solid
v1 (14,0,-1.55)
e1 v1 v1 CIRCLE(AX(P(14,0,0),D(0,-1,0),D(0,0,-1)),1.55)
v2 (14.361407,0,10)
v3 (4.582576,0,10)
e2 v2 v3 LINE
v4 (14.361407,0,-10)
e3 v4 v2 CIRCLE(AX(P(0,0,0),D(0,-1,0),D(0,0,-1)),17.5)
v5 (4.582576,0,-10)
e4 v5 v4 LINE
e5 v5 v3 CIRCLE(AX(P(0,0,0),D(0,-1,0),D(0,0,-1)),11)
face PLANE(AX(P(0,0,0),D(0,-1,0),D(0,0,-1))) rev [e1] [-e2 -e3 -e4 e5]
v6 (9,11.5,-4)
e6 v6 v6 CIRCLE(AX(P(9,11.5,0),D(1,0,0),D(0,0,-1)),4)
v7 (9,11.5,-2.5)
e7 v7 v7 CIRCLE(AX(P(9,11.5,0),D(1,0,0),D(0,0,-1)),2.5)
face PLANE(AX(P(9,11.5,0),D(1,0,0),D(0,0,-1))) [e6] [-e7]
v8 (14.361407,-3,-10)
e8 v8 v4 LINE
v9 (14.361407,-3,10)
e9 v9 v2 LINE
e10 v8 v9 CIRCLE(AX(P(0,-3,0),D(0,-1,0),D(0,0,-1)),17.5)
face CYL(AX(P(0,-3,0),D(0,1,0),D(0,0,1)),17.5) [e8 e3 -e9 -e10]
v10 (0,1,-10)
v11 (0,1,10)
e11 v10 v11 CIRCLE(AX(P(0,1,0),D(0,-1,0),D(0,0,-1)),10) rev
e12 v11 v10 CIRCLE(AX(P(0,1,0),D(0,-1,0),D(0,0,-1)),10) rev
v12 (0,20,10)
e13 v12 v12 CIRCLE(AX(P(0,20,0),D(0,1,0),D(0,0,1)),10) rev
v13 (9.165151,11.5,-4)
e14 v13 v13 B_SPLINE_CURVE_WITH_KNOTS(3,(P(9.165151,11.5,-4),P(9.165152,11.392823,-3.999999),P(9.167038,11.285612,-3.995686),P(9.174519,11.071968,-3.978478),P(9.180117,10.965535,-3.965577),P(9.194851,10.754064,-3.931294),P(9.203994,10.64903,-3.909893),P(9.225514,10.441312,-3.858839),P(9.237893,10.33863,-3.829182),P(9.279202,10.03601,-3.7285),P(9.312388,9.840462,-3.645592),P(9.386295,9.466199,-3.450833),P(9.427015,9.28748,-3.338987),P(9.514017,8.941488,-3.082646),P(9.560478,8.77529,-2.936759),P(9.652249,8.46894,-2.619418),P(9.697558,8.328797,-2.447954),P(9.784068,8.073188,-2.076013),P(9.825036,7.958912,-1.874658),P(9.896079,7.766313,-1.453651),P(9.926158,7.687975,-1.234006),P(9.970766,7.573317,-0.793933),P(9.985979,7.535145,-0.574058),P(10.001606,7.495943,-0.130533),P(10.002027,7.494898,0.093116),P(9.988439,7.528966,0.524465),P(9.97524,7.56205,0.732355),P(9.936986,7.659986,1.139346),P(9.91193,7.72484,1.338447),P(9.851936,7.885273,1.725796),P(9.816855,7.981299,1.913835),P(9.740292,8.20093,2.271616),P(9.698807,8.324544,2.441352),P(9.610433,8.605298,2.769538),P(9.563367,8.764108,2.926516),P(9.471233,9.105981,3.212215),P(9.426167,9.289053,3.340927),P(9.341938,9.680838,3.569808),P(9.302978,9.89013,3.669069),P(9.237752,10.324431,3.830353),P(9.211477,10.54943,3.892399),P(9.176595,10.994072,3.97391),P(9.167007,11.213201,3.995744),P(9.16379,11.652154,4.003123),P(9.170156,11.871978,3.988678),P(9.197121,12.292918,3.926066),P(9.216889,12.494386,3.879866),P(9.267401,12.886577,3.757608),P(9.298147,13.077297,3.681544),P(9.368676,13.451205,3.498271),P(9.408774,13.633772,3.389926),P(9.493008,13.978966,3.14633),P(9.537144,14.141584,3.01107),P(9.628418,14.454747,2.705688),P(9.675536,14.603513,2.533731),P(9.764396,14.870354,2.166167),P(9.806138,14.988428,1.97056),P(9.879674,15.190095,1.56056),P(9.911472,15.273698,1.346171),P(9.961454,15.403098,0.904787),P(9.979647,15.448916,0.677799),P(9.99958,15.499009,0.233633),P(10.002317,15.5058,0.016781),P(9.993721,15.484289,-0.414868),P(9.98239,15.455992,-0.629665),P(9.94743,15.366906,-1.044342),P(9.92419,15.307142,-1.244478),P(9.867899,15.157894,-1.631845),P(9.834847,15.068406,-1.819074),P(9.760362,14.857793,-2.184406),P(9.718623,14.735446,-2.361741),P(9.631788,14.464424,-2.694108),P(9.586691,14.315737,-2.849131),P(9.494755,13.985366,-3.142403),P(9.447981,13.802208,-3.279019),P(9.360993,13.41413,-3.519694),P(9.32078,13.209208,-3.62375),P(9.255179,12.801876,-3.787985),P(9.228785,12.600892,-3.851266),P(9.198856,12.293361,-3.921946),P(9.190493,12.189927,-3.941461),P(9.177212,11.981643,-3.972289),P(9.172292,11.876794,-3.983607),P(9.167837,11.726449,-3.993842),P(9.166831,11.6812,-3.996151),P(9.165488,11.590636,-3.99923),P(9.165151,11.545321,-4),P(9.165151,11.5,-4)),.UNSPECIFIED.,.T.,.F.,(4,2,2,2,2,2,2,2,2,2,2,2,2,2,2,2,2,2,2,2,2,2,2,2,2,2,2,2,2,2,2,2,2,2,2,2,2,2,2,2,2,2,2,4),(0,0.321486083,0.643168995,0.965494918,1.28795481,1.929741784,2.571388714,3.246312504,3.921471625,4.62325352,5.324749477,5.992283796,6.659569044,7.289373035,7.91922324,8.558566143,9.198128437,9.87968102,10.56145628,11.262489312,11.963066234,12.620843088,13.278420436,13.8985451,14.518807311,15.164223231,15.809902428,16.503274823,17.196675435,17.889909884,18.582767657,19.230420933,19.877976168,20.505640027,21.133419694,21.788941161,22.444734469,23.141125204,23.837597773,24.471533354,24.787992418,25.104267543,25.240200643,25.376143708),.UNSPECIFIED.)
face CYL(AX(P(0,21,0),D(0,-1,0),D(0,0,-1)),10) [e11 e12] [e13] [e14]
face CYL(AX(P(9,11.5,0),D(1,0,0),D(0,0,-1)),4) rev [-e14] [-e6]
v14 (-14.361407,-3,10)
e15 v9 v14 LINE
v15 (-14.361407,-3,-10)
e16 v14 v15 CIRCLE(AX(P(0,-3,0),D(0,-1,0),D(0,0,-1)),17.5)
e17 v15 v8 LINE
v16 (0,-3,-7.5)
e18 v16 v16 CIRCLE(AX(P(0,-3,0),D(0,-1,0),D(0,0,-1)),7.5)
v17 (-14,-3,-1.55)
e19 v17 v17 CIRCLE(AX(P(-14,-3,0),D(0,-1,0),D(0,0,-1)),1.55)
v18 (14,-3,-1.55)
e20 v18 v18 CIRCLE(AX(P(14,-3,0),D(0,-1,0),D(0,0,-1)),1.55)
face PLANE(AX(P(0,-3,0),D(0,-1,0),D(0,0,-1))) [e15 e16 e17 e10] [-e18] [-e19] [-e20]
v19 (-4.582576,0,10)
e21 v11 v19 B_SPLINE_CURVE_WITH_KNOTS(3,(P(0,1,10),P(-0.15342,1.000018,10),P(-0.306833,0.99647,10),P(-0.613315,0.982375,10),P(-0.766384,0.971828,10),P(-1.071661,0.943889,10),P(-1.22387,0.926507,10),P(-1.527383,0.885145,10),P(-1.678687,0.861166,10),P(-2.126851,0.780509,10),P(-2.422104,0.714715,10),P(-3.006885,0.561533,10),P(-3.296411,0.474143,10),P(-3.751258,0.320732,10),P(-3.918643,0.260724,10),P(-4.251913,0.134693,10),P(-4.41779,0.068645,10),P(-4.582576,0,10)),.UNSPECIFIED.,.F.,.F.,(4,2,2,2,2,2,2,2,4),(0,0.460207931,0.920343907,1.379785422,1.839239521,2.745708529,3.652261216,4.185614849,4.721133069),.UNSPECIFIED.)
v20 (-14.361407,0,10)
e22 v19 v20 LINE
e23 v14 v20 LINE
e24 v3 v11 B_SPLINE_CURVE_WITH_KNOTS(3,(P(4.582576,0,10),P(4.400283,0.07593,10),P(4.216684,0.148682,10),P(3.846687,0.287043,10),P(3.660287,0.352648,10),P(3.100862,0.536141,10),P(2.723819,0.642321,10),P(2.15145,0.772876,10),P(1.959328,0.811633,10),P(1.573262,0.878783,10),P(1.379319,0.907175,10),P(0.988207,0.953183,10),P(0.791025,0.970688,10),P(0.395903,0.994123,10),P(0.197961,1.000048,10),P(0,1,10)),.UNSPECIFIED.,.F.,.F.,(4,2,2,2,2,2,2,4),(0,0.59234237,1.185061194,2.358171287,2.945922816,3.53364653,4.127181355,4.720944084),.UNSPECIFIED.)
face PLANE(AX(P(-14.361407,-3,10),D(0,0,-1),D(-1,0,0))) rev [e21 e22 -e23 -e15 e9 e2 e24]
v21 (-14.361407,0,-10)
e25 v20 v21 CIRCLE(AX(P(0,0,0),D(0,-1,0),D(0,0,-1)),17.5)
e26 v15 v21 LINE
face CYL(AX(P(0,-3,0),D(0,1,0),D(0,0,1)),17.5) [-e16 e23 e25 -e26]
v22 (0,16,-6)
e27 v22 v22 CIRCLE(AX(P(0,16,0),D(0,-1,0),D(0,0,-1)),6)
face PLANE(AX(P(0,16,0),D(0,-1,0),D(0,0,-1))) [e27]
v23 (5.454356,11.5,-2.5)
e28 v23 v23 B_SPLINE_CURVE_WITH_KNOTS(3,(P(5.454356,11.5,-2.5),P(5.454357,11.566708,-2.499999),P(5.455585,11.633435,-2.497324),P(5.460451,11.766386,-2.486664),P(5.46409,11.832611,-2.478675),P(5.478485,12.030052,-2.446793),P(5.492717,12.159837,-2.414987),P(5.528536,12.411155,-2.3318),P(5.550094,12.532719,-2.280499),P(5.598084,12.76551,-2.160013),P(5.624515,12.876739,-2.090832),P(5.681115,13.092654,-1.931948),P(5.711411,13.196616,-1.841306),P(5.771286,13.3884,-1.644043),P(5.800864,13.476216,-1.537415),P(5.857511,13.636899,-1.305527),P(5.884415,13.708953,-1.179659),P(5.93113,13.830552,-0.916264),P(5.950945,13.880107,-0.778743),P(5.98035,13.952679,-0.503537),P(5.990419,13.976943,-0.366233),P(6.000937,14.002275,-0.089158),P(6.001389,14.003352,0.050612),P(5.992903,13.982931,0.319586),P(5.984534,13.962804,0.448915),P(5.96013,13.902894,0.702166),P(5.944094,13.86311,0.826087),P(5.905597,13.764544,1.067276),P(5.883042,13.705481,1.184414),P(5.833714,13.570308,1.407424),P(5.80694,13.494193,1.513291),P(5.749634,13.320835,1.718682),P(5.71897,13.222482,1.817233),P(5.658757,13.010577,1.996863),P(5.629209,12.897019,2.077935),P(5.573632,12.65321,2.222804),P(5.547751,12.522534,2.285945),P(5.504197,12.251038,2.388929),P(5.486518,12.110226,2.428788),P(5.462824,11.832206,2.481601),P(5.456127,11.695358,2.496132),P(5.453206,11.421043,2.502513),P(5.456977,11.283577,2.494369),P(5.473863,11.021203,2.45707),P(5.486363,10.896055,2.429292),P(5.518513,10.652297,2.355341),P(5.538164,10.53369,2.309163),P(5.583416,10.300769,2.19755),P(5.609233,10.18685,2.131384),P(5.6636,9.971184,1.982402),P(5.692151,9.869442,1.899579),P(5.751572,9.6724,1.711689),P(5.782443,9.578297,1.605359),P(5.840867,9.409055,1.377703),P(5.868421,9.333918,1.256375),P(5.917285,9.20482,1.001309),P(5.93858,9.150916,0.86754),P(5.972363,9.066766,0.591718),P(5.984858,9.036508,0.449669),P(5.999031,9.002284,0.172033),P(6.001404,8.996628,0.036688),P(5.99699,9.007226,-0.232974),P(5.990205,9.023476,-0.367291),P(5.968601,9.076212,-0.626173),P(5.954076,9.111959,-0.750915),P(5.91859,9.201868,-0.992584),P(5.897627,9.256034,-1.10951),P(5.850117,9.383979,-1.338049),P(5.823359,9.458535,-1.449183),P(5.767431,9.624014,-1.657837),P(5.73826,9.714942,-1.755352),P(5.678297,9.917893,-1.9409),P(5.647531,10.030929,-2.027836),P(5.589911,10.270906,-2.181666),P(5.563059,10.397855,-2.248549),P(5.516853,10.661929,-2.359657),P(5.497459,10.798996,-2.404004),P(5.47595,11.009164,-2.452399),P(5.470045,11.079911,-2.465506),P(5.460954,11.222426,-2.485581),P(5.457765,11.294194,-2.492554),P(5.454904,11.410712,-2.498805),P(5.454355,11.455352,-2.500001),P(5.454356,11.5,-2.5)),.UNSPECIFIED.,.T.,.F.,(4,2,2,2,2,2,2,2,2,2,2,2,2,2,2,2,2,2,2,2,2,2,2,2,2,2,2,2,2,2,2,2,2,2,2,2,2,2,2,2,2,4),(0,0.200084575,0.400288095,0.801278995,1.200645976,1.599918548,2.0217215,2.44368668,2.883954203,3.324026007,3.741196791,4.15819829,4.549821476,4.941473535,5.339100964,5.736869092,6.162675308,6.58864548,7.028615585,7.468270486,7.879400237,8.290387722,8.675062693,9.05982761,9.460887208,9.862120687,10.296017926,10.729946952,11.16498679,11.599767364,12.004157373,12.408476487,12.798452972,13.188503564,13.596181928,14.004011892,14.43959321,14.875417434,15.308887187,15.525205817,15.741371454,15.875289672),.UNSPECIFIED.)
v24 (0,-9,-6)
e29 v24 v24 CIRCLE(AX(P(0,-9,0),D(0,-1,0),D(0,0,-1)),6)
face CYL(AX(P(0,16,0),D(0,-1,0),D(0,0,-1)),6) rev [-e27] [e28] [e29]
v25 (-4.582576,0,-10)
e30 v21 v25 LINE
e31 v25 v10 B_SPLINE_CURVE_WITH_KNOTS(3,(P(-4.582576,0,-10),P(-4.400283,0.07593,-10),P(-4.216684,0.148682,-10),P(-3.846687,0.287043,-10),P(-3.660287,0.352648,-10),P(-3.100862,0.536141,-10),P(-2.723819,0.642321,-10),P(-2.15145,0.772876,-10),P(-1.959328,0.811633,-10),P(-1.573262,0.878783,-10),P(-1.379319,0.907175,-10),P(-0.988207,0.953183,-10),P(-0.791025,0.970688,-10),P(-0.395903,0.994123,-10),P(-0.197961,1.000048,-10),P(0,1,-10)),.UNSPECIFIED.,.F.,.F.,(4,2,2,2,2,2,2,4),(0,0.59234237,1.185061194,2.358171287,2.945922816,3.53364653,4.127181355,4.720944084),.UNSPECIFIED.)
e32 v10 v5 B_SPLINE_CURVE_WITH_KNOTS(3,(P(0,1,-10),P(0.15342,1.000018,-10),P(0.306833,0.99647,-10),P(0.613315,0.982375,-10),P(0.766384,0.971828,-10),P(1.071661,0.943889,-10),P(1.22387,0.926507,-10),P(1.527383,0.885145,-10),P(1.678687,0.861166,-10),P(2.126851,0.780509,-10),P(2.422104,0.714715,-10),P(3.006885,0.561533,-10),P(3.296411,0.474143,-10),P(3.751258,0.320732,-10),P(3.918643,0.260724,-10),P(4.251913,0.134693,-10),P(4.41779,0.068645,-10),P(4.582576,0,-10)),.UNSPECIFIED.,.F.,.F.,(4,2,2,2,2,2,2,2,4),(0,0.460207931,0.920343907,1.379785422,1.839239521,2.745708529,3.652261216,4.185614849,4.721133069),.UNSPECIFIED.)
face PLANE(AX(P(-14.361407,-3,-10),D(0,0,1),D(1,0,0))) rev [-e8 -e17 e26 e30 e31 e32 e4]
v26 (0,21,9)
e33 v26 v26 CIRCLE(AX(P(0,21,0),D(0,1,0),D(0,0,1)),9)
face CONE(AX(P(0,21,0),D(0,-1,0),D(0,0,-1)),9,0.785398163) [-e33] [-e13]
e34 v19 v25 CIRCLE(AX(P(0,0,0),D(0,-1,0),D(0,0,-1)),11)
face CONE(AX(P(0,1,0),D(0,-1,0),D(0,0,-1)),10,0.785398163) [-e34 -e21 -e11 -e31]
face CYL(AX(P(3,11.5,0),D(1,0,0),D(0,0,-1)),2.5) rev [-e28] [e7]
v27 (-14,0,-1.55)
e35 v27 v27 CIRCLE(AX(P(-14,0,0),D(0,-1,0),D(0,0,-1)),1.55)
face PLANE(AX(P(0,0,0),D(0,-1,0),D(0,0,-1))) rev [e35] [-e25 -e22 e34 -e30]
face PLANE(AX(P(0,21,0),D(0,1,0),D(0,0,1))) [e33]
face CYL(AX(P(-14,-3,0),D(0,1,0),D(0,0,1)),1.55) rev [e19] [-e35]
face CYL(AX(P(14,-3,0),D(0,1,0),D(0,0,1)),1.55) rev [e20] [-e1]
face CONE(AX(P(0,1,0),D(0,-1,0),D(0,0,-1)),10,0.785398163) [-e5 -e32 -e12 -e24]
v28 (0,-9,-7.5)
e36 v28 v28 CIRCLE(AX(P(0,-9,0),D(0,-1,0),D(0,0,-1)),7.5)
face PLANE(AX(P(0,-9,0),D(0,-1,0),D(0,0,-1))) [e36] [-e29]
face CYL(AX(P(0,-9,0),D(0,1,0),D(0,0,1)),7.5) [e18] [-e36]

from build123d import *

# Parameters (mm, degrees)
SKETCH1_R           = 10
BOSS_EXTRUDE1_DEPTH = 21
SKETCH2_R           = 1.55
BOSS_EXTRUDE2_DEPTH = 3
SKETCH3_R           = 7.5
BOSS_EXTRUDE3_DEPTH = 6
SKETCH4_R           = 6
CUT_EXTRUDE1_DEPTH  = 25
SKETCH6_R           = 4
CUT_EXTRUDE2_DEPTH  = 1
SKETCH7_R           = 2.5
CUT_EXTRUDE3_DEPTH  = 6
CHAMFER1_SIZE       = 1


with BuildPart() as part:
    # Sketch1 → Boss-Extrude1 (new body)
    with BuildSketch(Plane(origin=(0, 0, 0), x_dir=(1, 0, 0), z_dir=(0, 1, 0))):
        with Locations(Location((0, 0, 0), (0, 0, 90))):
            Circle(SKETCH1_R)
    extrude(amount=BOSS_EXTRUDE1_DEPTH)

    # Sketch2 → Boss-Extrude2 (add)
    with BuildSketch(Plane.XZ):
        with BuildLine():
            Line((-14.361406616, -10), (14.361406616, -10))
            ThreePointArc((14.361406616, -10), (17.5, 0), (14.361406616, 10))
            Line((14.361406616, 10), (-14.361406616, 10))
            ThreePointArc((-14.361406616, 10), (-17.5, 0), (-14.361406616, -10))
        make_face()
        with Locations(Location((-14, 0, 0), (0, 0, 270))):
            Circle(SKETCH2_R, mode=Mode.SUBTRACT)
        with Locations(Location((14, 0, 0), (0, 0, 270))):
            Circle(SKETCH2_R, mode=Mode.SUBTRACT)
    extrude(amount=BOSS_EXTRUDE2_DEPTH)

    # Sketch3 → Boss-Extrude3 (add)
    with BuildSketch(Plane.XZ.offset(3)):
        with Locations(Location((0, 0, 0), (0, 0, 270))):
            Circle(SKETCH3_R)
    extrude(amount=BOSS_EXTRUDE3_DEPTH)

    # Sketch4 → Cut-Extrude1 (cut)
    with BuildSketch(Plane.XZ.offset(9)):
        with Locations(Location((0, 0, 0), (0, 0, 270))):
            Circle(SKETCH4_R)
    extrude(amount=-CUT_EXTRUDE1_DEPTH, mode=Mode.SUBTRACT)

    # Sketch6 → Cut-Extrude2 (cut)
    with BuildSketch(Plane(origin=(10, 0, 0), x_dir=(0, 0, -1), z_dir=(1, 0, 0))):
        with Locations((0, 11.5)):
            Circle(SKETCH6_R)
    extrude(amount=-CUT_EXTRUDE2_DEPTH, mode=Mode.SUBTRACT)

    # Sketch7 → Cut-Extrude3 (cut)
    with BuildSketch(Plane(origin=(9, 0, 0), x_dir=(0, 0, -1), z_dir=(1, 0, 0))):
        with Locations((0, 11.5)):
            Circle(SKETCH7_R)
    extrude(amount=-CUT_EXTRUDE3_DEPTH, mode=Mode.SUBTRACT)

    # Chamfer1
    # the kernel refuses this chamfer: 1 mm, written as the material it adds along each edge
    with BuildSketch(Plane(origin=(0, 0, 0), x_dir=(-2.2377941338409155e-09, 0, 1.0), z_dir=(-1.0, 0, -2.2377941338409155e-09))) as chamfer1_piece_1_section:
        Polygon((10, CHAMFER1_SIZE), (10 + CHAMFER1_SIZE, 0), (10, 0), align=None)
    chamfer1_piece_1 = revolve(axis=Axis((0, 0, 0), (0, 1, 0)), revolution_arc=180.000000128, mode=Mode.PRIVATE)
    chamfer1_piece_1 = split(chamfer1_piece_1, bisect_by=Plane(origin=(10.483044341, 0.483044342, -10), z_dir=(0, 0, 1)), keep=Keep.TOP, mode=Mode.PRIVATE)
    chamfer1_piece_1 = split(chamfer1_piece_1, bisect_by=Plane(origin=(10.483044341, 0.483044342, 10), z_dir=(0, 0, -1)), keep=Keep.TOP, mode=Mode.PRIVATE)
    add(chamfer1_piece_1)
    with BuildSketch(Plane(origin=(0, 0, 0), x_dir=(0, 0, -1), z_dir=(1, 0, 0))) as chamfer1_piece_2_section:
        Polygon((10, CHAMFER1_SIZE), (10 + CHAMFER1_SIZE, 0), (10, 0), align=None)
    chamfer1_piece_2 = revolve(axis=Axis((0, 0, 0), (0, 1, 0)), revolution_arc=179.999999872, mode=Mode.PRIVATE)
    chamfer1_piece_2 = split(chamfer1_piece_2, bisect_by=Plane(origin=(-10.483044341, 0.483044341, -10), z_dir=(0, 0, 1)), keep=Keep.TOP, mode=Mode.PRIVATE)
    chamfer1_piece_2 = split(chamfer1_piece_2, bisect_by=Plane(origin=(-10.483044341, 0.483044341, 10), z_dir=(0, 0, -1)), keep=Keep.TOP, mode=Mode.PRIVATE)
    add(chamfer1_piece_2)
    # the kernel refuses this chamfer: 1 mm, written as the material it takes off along each edge
    with BuildSketch(Plane(origin=(0, 21, 0), x_dir=(0, 0, -1), z_dir=(1, 0, 0))) as chamfer1_2_piece_1:
        Polygon((10, -CHAMFER1_SIZE), (10 - CHAMFER1_SIZE, 0), (10, 0), align=None)
    revolve(axis=Axis((0, 21, 0), (0, 1, 0)), mode=Mode.SUBTRACT)


solid = part.part
